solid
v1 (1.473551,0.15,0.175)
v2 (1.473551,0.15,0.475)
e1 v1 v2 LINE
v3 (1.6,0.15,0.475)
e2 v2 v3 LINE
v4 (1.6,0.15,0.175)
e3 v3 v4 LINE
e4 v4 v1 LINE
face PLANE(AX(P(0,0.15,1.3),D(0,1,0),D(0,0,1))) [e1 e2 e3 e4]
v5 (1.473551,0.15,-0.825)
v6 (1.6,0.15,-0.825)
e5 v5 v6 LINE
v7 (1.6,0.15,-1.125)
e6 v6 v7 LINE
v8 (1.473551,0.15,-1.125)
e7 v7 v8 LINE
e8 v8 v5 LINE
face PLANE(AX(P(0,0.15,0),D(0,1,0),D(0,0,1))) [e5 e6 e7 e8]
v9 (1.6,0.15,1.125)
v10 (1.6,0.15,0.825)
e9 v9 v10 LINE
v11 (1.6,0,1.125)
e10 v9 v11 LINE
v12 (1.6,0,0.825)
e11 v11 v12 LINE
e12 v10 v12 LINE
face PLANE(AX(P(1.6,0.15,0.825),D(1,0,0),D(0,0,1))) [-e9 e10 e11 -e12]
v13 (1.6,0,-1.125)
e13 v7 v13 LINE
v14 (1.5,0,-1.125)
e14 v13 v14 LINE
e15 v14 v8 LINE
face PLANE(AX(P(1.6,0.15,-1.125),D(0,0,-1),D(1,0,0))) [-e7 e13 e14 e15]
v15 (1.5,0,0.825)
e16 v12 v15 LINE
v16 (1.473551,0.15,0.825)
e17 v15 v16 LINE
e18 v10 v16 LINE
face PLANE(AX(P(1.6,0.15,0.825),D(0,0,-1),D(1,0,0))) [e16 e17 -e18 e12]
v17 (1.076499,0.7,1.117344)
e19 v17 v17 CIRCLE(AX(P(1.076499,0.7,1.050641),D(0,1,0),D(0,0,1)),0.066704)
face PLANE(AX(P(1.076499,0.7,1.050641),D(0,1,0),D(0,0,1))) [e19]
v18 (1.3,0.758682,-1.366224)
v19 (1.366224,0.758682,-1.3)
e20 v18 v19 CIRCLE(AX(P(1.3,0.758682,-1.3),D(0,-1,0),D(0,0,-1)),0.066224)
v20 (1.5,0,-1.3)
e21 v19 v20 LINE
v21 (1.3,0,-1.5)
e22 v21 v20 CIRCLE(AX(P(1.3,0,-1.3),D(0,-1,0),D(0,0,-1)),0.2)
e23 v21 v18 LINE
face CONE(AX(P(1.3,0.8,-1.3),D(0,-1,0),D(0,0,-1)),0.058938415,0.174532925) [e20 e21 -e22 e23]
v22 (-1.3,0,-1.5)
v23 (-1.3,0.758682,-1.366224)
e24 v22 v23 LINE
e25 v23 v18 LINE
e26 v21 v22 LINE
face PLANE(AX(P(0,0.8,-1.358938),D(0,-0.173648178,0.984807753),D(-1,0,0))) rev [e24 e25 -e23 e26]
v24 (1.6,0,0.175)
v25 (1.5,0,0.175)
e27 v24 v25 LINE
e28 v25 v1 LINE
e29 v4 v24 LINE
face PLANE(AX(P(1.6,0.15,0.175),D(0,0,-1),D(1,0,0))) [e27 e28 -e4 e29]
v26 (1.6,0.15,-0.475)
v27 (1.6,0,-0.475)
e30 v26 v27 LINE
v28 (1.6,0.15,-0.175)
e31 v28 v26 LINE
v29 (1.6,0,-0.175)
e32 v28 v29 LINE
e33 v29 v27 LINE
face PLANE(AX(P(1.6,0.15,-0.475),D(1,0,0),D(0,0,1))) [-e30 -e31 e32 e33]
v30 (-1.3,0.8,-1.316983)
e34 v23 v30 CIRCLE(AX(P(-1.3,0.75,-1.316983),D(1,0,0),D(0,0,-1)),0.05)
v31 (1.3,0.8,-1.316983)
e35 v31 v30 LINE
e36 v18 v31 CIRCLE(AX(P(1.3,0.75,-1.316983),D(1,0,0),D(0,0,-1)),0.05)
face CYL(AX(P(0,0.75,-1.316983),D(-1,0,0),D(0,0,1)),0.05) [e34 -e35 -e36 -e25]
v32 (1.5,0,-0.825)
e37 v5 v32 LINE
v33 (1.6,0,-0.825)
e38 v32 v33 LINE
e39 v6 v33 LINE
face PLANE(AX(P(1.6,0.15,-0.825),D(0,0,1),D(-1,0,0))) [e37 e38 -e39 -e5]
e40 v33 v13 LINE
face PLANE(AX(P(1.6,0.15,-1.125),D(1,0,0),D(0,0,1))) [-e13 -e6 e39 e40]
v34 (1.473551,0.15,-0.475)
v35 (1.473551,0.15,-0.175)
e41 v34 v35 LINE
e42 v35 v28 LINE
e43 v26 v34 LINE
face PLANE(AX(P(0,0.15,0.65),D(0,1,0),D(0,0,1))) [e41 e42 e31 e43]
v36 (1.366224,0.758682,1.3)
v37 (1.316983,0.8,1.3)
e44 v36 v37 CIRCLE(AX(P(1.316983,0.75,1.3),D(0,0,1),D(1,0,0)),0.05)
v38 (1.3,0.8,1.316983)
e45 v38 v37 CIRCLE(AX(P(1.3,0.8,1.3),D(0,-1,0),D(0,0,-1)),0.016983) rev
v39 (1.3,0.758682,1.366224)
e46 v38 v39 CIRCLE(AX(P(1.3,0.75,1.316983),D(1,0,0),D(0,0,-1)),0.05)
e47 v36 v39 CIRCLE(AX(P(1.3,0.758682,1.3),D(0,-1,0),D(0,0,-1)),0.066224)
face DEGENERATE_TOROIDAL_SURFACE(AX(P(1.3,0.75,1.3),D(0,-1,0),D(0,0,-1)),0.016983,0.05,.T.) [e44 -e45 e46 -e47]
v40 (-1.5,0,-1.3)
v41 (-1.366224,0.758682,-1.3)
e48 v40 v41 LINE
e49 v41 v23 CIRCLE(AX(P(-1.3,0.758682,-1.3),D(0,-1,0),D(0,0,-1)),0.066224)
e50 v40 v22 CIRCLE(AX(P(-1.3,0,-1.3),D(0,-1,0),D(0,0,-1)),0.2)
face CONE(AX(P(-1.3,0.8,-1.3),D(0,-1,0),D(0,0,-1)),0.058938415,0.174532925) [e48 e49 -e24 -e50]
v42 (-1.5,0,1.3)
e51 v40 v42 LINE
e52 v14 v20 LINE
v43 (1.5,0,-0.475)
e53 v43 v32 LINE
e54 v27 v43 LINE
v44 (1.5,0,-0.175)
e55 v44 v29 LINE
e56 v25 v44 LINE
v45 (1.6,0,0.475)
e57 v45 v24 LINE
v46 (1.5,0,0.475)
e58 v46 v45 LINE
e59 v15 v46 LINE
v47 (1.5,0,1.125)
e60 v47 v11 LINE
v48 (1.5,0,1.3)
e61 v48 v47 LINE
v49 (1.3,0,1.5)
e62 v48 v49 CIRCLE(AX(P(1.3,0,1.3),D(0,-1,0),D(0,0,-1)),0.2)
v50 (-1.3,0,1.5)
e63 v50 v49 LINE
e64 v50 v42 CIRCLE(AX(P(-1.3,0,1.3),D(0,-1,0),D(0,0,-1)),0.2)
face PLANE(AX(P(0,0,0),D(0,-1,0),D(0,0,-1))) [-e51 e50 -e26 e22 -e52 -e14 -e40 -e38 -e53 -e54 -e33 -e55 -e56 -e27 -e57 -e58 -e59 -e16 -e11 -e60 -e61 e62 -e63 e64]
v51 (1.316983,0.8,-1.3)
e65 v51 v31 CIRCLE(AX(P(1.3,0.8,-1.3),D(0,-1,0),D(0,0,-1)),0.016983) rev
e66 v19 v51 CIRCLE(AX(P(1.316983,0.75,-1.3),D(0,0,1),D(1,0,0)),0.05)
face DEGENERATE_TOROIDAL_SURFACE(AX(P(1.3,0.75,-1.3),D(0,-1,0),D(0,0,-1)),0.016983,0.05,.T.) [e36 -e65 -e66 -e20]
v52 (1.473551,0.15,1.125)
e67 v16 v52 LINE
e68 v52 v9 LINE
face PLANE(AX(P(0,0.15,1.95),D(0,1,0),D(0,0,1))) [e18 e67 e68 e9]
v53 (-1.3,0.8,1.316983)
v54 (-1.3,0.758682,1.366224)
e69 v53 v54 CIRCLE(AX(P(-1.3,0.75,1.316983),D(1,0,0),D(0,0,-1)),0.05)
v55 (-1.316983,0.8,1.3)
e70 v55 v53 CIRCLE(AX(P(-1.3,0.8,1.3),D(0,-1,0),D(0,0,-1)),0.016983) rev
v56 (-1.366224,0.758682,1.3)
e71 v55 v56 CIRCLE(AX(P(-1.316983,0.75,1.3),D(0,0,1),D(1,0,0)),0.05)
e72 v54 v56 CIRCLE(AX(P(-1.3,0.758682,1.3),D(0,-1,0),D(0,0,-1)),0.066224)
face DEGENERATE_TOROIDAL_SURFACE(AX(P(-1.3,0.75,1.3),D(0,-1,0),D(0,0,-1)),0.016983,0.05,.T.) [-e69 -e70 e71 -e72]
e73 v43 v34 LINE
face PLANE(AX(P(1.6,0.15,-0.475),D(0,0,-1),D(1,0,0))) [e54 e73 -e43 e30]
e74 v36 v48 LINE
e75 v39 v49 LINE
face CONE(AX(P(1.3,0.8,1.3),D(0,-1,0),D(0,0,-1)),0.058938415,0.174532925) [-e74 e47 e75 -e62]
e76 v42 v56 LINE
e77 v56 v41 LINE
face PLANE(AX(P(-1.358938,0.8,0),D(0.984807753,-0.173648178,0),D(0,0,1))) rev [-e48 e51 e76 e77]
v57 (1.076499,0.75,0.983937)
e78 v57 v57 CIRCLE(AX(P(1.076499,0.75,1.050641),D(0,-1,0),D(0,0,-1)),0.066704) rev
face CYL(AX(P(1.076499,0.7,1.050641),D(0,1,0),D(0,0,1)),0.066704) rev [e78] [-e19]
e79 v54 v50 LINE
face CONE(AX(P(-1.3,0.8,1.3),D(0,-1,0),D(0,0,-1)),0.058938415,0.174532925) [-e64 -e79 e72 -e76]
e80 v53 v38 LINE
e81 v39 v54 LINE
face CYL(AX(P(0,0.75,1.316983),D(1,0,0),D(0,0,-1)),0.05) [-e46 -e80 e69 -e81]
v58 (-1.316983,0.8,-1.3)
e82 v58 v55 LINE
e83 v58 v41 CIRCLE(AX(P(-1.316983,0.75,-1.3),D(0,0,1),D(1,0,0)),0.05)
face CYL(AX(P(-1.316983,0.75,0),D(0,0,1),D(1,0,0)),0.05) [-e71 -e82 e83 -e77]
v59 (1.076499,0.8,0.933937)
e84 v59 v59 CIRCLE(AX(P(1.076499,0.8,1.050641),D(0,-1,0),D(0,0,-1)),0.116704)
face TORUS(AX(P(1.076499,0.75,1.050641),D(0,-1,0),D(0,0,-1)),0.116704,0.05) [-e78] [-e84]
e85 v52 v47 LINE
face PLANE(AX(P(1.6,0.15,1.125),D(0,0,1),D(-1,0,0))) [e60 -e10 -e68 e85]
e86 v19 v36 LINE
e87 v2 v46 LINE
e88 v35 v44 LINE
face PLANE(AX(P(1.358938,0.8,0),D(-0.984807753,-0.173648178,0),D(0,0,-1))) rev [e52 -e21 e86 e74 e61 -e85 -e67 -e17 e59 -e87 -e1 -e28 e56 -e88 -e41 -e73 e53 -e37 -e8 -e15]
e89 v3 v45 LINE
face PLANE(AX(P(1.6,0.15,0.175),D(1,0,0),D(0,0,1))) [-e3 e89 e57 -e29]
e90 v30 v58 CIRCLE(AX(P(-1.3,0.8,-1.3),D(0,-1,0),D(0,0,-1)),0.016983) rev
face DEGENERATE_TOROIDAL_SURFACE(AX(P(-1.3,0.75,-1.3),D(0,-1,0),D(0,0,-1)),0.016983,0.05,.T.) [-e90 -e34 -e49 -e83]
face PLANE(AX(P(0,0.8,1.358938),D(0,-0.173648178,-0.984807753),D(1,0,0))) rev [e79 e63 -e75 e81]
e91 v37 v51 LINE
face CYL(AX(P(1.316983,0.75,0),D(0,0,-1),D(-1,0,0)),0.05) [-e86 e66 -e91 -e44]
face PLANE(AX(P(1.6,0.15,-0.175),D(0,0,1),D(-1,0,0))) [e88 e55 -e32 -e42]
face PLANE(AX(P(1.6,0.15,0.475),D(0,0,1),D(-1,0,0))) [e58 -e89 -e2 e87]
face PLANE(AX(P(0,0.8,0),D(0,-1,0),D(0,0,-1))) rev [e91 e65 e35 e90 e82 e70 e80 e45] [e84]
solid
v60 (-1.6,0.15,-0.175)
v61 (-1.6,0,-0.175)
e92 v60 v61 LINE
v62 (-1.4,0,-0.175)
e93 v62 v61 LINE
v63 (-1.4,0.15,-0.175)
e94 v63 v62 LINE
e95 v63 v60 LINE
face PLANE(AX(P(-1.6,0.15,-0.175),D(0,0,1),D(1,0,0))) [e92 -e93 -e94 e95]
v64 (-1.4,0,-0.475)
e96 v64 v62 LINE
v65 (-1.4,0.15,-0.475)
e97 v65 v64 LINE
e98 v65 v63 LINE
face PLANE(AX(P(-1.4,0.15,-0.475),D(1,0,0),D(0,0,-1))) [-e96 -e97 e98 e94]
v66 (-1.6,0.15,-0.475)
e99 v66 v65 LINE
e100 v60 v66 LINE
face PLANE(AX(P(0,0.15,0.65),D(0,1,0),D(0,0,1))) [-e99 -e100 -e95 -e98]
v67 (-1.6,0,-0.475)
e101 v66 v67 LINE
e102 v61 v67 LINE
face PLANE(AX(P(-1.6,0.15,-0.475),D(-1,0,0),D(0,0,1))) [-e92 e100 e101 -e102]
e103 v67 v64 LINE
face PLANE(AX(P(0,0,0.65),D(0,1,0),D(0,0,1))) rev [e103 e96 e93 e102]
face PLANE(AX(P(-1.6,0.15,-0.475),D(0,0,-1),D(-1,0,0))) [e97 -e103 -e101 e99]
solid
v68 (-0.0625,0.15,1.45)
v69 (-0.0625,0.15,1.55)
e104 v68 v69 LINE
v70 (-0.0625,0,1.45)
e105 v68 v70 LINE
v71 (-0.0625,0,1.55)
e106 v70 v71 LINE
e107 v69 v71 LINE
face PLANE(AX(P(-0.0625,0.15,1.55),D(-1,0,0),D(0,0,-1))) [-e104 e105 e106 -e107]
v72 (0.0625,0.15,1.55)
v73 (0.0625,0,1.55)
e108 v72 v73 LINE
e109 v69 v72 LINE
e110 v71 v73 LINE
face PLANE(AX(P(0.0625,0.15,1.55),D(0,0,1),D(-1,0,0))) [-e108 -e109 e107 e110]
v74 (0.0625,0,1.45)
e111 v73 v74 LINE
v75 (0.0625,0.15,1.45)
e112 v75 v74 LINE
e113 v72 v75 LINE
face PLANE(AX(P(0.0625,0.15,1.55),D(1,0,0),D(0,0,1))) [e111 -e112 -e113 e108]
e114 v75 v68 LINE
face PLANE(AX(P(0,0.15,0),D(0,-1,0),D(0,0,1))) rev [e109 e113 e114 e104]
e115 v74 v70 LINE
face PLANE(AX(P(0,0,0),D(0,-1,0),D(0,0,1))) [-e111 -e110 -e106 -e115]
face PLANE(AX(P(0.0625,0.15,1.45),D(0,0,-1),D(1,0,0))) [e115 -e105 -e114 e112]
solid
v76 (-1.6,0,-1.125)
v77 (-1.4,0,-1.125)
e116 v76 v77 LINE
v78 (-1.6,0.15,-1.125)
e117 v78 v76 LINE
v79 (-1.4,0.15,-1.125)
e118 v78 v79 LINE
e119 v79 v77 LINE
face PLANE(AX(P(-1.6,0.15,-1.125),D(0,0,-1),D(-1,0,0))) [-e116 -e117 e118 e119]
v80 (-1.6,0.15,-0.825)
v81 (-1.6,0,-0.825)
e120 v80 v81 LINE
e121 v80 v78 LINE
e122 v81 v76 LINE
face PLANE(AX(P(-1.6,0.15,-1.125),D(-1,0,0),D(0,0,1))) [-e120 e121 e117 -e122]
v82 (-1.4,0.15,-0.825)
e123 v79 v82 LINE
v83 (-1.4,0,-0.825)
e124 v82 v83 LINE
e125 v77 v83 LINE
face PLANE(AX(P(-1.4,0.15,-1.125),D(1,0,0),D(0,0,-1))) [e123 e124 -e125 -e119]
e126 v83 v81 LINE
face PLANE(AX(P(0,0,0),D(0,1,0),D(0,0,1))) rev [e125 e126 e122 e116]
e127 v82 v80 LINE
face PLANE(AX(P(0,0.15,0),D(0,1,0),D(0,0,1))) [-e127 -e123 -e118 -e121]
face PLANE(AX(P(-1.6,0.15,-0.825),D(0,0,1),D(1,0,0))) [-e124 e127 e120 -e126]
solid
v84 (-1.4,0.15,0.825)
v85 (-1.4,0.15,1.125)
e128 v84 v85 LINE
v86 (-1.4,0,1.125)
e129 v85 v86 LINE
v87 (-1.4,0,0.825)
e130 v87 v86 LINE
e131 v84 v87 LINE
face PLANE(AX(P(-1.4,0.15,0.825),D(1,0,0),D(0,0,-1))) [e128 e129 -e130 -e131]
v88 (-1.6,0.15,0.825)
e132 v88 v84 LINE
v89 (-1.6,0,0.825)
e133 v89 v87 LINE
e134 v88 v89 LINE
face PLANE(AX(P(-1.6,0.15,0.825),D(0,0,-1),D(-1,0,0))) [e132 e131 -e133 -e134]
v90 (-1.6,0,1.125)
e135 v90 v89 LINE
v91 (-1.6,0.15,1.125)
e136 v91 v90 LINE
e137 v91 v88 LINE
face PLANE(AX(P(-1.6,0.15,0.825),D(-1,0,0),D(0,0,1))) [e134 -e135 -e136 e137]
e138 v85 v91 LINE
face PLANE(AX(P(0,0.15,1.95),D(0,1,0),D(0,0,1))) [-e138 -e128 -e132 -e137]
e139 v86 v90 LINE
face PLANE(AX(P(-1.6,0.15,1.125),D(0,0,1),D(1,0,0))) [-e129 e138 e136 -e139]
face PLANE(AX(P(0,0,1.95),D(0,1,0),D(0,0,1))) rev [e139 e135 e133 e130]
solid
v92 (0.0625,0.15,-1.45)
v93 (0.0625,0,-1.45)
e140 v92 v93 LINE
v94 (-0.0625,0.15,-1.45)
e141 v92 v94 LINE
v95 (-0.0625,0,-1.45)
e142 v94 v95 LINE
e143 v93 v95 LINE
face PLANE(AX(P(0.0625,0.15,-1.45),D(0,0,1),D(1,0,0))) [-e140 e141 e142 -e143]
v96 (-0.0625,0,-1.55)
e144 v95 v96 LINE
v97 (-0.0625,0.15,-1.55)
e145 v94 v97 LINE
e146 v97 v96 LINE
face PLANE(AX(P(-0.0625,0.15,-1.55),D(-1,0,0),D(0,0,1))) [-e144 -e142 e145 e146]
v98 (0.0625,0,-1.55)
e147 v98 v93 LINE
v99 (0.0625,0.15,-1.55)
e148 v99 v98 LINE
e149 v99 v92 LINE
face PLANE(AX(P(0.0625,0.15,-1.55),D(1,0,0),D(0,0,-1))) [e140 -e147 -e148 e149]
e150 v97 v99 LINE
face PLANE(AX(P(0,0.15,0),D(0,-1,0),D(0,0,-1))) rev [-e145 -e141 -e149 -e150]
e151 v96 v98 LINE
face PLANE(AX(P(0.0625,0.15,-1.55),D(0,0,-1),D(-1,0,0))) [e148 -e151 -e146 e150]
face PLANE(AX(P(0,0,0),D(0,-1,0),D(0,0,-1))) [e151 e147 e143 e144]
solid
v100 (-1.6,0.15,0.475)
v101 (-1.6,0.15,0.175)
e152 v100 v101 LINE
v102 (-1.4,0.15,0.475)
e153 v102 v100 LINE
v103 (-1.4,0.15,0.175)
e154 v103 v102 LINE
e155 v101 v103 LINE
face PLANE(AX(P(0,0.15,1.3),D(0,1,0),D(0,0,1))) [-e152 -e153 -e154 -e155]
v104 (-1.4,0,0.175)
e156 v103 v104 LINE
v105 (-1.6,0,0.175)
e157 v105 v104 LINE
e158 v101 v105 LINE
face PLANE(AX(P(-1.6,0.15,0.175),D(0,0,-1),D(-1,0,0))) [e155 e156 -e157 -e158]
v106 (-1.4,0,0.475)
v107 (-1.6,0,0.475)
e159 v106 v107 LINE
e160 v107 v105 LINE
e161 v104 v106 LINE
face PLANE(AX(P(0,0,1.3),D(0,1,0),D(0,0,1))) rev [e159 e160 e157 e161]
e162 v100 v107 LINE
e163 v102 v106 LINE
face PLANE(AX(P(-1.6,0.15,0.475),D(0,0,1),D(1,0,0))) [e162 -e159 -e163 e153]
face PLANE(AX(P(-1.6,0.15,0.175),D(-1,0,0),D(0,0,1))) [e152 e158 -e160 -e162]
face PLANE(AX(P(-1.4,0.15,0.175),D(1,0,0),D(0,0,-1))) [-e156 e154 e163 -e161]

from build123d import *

# Parameters (mm, degrees)
SKETCH1_W               = 3
SKETCH1_H               = 3
BOSS_EXTRUDE1_DEPTH     = 0.8
FILLET1_R               = 0.2
CHAMFER1_SIZE           = 0.8
CHAMFER1_SIZE_2         = 0.141061585
SKETCH2_W               = 0.2
SKETCH2_H               = 0.3
BOSS_EXTRUDE2_DEPTH     = 0.15
LPATTERN1_COUNT         = 4
LPATTERN1_PITCH         = 0.65
MIRROR2_COPY_1_SKETCH_W = 0.2
MIRROR2_COPY_1_SKETCH_H = 0.3
MIRROR2_COPY_1_DEPTH    = 0.15
MIRROR2_COPY_2_SKETCH_W = 0.2
MIRROR2_COPY_2_SKETCH_H = 0.3
MIRROR2_COPY_2_DEPTH    = 0.15
MIRROR2_COPY_3_SKETCH_W = 0.2
MIRROR2_COPY_3_SKETCH_H = 0.3
MIRROR2_COPY_3_DEPTH    = 0.15
SKETCH3_R               = 0.066703592
CUT_EXTRUDE1_DEPTH      = 0.1
SKETCH4_W               = 0.125
SKETCH4_H               = 0.1
BOSS_EXTRUDE3_DEPTH     = 0.15
FILLET2_R               = 0.05


with BuildPart() as part:
    # Sketch1 → Boss-Extrude1 (new body)
    with BuildSketch(Plane(origin=(0, 0, 0), x_dir=(1, 0, 0), z_dir=(0, 1, 0))):
        Rectangle(SKETCH1_W, SKETCH1_H)
    extrude(amount=BOSS_EXTRUDE1_DEPTH)

    # Fillet1
    fillet1_edges = [part.edges().sort_by_distance(p)[0] for p in [
        (1.5, 0.4, 1.5),
        (-1.5, 0.4, 1.5),
        (-1.5, 0.4, -1.5),
        (1.5, 0.4, -1.5),
    ]]
    fillet(fillet1_edges, radius=FILLET1_R)

    # Chamfer1
    # the kernel refuses this chamfer: 0.8, 0.141061585 mm, written as the material it takes off along each edge
    with BuildSketch(Plane(origin=(-1.3, 0.8, 1.5), x_dir=(0, -0.9999776716360547, 0.006682531656101619), z_dir=(1, 0, 0))) as chamfer1_piece_1:
        Polygon((CHAMFER1_SIZE * 0.999977671636, CHAMFER1_SIZE * 0.0066825316561), (-CHAMFER1_SIZE_2 * 0.00668253163558, CHAMFER1_SIZE_2 * 0.999977668565), (0, 0), align=None)
    extrude(amount=2.6, mode=Mode.SUBTRACT)
    with BuildSketch(Plane(origin=(-1.5, 0.8, -1.3), x_dir=(0.9776715712462587, 0.2101387607674316, 0), z_dir=(0, 0, 1)), Plane(origin=(1.3, 0.8, -1.5), x_dir=(0, 0.2101387607674316, 0.9776715712462587), z_dir=(-1, 0, 0)), Plane(origin=(1.5, 0.8, 1.3), x_dir=(-0.9776715712462587, 0.2101387607674316, 0), z_dir=(0, 0, -1))) as chamfer1_piece_2:
        Polygon((CHAMFER1_SIZE_2 * 0.977671568244, -CHAMFER1_SIZE_2 * 0.210138760122), (-CHAMFER1_SIZE * 0.210138760767, -CHAMFER1_SIZE * 0.977671571246), (0, 0), align=None)
    extrude(amount=2.6, mode=Mode.SUBTRACT)
    with BuildSketch(Plane(origin=(1.3, 0.8, -1.3), x_dir=(1, 0, 0), z_dir=(0, 0, 1))) as chamfer1_piece_3:
        Polygon((0.2 - CHAMFER1_SIZE_2 * 0.999999996929, 0), (0.2, -CHAMFER1_SIZE), (0.2, 0), align=None)
    revolve(axis=Axis((1.3, 0.8, -1.3), (0, 1, 0)), revolution_arc=90, mode=Mode.SUBTRACT)
    with BuildSketch(Plane(origin=(1.3, 0.8, 1.3), x_dir=(0, 0, 1), z_dir=(-1, 0, 0))) as chamfer1_piece_4:
        Polygon((0.2, -CHAMFER1_SIZE), (0.2 - CHAMFER1_SIZE_2 * 0.999999996929, 0), (0.2, 0), align=None)
    revolve(axis=Axis((1.3, 0.8, 1.3), (0, 1, 0)), revolution_arc=90, mode=Mode.SUBTRACT)
    with BuildSketch(Plane(origin=(-1.3, 0.8, 1.3), x_dir=(0, 0, 1), z_dir=(1, 0, 0))) as chamfer1_piece_5:
        Polygon((0.2, CHAMFER1_SIZE), (0.2 - CHAMFER1_SIZE_2 * 0.999999996929, 0), (0.2, 0), align=None)
    revolve(axis=Axis((-1.3, 0.8, 1.3), (0, -1, 0)), revolution_arc=90, mode=Mode.SUBTRACT)
    with BuildSketch(Plane(origin=(-1.3, 0.8, -1.3), x_dir=(0, 0, -1), z_dir=(1, 0, 0))) as chamfer1_piece_6:
        Polygon((0.2 - CHAMFER1_SIZE_2 * 0.999999996929, 0), (0.2, -CHAMFER1_SIZE), (0.2, 0), align=None)
    revolve(axis=Axis((-1.3, 0.8, -1.3), (0, 1, 0)), revolution_arc=90, mode=Mode.SUBTRACT)


with BuildPart() as body_2:
    # Sketch2 → Boss-Extrude2 (new body)
    with BuildSketch(Plane.XZ):
        with Locations((-1.5, -0.975)):
            Rectangle(SKETCH2_W, SKETCH2_H)
    boss_extrude2 = extrude(amount=-BOSS_EXTRUDE2_DEPTH)


with BuildPart() as lpattern1_1:
    # LPattern1: Boss-Extrude2 ×4
    with Locations(*[(0, 0, i * LPATTERN1_PITCH) for i in range(1, LPATTERN1_COUNT)]):
        add(boss_extrude2)


with BuildPart() as part_1:
    add(part.part)

    # Mirror2: Boss-Extrude2 across plane
    add(boss_extrude2.mirror(Plane.ZY))

    # Mirror2 copy 1 sketch → Mirror2 copy 1 (add)
    with BuildSketch(Plane(origin=(0, 0, 0.65), x_dir=(-1, 0, 0), z_dir=(0, -1, 0))):
        with Locations((-1.5, 0.975)):
            Rectangle(MIRROR2_COPY_1_SKETCH_W, MIRROR2_COPY_1_SKETCH_H)
    extrude(amount=-MIRROR2_COPY_1_DEPTH)

    # Mirror2 copy 2 sketch → Mirror2 copy 2 (add)
    with BuildSketch(Plane(origin=(0, 0, 1.3), x_dir=(-1, 0, 0), z_dir=(0, -1, 0))):
        with Locations((-1.5, 0.975)):
            Rectangle(MIRROR2_COPY_2_SKETCH_W, MIRROR2_COPY_2_SKETCH_H)
    extrude(amount=-MIRROR2_COPY_2_DEPTH)

    # Mirror2 copy 3 sketch → Mirror2 copy 3 (add)
    with BuildSketch(Plane(origin=(0, 0, 1.95), x_dir=(-1, 0, 0), z_dir=(0, -1, 0))):
        with Locations((-1.5, 0.975)):
            Rectangle(MIRROR2_COPY_3_SKETCH_W, MIRROR2_COPY_3_SKETCH_H)
    extrude(amount=-MIRROR2_COPY_3_DEPTH)

    # Sketch3 → Cut-Extrude1 (cut)
    with BuildSketch(Plane(origin=(0, 0.8, 0), x_dir=(1, 0, 0), z_dir=(0, 1, 0))):
        with Locations(Location((1.07649938, -1.050640543, 0), (0, 0, 270))):
            Circle(SKETCH3_R)
    extrude(amount=-CUT_EXTRUDE1_DEPTH, mode=Mode.SUBTRACT)

    # Fillet2
    fillet2_edges = [part_1.edges().sort_by_distance(p)[0] for p in [
        (1.07649938, 0.8, 0.983936951),
        (0, 0.8, -1.358938415),
        (-1.341675753, 0.8, -1.341675753),
        (-1.358938415, 0.8, 0),
        (-1.341675753, 0.8, 1.341675753),
        (0, 0.8, 1.358938415),
        (1.341675753, 0.8, 1.341675753),
        (1.358938415, 0.8, 0),
        (1.341675753, 0.8, -1.341675753),
    ]]
    fillet(fillet2_edges, radius=FILLET2_R)


with BuildPart() as body_6:
    # Sketch4 → Boss-Extrude3 (new body)
    with BuildSketch(Plane.XZ):
        with Locations((0, -1.5)):
            Rectangle(SKETCH4_W, SKETCH4_H)
    extrude(amount=-BOSS_EXTRUDE3_DEPTH)


with BuildPart() as body_7:
    # Mirror7: mirrored copy
    add(body_6.part.mirror(Plane.XY))


solid = Compound([body_2.part, lpattern1_1.part, part_1.part, body_6.part, body_7.part])
